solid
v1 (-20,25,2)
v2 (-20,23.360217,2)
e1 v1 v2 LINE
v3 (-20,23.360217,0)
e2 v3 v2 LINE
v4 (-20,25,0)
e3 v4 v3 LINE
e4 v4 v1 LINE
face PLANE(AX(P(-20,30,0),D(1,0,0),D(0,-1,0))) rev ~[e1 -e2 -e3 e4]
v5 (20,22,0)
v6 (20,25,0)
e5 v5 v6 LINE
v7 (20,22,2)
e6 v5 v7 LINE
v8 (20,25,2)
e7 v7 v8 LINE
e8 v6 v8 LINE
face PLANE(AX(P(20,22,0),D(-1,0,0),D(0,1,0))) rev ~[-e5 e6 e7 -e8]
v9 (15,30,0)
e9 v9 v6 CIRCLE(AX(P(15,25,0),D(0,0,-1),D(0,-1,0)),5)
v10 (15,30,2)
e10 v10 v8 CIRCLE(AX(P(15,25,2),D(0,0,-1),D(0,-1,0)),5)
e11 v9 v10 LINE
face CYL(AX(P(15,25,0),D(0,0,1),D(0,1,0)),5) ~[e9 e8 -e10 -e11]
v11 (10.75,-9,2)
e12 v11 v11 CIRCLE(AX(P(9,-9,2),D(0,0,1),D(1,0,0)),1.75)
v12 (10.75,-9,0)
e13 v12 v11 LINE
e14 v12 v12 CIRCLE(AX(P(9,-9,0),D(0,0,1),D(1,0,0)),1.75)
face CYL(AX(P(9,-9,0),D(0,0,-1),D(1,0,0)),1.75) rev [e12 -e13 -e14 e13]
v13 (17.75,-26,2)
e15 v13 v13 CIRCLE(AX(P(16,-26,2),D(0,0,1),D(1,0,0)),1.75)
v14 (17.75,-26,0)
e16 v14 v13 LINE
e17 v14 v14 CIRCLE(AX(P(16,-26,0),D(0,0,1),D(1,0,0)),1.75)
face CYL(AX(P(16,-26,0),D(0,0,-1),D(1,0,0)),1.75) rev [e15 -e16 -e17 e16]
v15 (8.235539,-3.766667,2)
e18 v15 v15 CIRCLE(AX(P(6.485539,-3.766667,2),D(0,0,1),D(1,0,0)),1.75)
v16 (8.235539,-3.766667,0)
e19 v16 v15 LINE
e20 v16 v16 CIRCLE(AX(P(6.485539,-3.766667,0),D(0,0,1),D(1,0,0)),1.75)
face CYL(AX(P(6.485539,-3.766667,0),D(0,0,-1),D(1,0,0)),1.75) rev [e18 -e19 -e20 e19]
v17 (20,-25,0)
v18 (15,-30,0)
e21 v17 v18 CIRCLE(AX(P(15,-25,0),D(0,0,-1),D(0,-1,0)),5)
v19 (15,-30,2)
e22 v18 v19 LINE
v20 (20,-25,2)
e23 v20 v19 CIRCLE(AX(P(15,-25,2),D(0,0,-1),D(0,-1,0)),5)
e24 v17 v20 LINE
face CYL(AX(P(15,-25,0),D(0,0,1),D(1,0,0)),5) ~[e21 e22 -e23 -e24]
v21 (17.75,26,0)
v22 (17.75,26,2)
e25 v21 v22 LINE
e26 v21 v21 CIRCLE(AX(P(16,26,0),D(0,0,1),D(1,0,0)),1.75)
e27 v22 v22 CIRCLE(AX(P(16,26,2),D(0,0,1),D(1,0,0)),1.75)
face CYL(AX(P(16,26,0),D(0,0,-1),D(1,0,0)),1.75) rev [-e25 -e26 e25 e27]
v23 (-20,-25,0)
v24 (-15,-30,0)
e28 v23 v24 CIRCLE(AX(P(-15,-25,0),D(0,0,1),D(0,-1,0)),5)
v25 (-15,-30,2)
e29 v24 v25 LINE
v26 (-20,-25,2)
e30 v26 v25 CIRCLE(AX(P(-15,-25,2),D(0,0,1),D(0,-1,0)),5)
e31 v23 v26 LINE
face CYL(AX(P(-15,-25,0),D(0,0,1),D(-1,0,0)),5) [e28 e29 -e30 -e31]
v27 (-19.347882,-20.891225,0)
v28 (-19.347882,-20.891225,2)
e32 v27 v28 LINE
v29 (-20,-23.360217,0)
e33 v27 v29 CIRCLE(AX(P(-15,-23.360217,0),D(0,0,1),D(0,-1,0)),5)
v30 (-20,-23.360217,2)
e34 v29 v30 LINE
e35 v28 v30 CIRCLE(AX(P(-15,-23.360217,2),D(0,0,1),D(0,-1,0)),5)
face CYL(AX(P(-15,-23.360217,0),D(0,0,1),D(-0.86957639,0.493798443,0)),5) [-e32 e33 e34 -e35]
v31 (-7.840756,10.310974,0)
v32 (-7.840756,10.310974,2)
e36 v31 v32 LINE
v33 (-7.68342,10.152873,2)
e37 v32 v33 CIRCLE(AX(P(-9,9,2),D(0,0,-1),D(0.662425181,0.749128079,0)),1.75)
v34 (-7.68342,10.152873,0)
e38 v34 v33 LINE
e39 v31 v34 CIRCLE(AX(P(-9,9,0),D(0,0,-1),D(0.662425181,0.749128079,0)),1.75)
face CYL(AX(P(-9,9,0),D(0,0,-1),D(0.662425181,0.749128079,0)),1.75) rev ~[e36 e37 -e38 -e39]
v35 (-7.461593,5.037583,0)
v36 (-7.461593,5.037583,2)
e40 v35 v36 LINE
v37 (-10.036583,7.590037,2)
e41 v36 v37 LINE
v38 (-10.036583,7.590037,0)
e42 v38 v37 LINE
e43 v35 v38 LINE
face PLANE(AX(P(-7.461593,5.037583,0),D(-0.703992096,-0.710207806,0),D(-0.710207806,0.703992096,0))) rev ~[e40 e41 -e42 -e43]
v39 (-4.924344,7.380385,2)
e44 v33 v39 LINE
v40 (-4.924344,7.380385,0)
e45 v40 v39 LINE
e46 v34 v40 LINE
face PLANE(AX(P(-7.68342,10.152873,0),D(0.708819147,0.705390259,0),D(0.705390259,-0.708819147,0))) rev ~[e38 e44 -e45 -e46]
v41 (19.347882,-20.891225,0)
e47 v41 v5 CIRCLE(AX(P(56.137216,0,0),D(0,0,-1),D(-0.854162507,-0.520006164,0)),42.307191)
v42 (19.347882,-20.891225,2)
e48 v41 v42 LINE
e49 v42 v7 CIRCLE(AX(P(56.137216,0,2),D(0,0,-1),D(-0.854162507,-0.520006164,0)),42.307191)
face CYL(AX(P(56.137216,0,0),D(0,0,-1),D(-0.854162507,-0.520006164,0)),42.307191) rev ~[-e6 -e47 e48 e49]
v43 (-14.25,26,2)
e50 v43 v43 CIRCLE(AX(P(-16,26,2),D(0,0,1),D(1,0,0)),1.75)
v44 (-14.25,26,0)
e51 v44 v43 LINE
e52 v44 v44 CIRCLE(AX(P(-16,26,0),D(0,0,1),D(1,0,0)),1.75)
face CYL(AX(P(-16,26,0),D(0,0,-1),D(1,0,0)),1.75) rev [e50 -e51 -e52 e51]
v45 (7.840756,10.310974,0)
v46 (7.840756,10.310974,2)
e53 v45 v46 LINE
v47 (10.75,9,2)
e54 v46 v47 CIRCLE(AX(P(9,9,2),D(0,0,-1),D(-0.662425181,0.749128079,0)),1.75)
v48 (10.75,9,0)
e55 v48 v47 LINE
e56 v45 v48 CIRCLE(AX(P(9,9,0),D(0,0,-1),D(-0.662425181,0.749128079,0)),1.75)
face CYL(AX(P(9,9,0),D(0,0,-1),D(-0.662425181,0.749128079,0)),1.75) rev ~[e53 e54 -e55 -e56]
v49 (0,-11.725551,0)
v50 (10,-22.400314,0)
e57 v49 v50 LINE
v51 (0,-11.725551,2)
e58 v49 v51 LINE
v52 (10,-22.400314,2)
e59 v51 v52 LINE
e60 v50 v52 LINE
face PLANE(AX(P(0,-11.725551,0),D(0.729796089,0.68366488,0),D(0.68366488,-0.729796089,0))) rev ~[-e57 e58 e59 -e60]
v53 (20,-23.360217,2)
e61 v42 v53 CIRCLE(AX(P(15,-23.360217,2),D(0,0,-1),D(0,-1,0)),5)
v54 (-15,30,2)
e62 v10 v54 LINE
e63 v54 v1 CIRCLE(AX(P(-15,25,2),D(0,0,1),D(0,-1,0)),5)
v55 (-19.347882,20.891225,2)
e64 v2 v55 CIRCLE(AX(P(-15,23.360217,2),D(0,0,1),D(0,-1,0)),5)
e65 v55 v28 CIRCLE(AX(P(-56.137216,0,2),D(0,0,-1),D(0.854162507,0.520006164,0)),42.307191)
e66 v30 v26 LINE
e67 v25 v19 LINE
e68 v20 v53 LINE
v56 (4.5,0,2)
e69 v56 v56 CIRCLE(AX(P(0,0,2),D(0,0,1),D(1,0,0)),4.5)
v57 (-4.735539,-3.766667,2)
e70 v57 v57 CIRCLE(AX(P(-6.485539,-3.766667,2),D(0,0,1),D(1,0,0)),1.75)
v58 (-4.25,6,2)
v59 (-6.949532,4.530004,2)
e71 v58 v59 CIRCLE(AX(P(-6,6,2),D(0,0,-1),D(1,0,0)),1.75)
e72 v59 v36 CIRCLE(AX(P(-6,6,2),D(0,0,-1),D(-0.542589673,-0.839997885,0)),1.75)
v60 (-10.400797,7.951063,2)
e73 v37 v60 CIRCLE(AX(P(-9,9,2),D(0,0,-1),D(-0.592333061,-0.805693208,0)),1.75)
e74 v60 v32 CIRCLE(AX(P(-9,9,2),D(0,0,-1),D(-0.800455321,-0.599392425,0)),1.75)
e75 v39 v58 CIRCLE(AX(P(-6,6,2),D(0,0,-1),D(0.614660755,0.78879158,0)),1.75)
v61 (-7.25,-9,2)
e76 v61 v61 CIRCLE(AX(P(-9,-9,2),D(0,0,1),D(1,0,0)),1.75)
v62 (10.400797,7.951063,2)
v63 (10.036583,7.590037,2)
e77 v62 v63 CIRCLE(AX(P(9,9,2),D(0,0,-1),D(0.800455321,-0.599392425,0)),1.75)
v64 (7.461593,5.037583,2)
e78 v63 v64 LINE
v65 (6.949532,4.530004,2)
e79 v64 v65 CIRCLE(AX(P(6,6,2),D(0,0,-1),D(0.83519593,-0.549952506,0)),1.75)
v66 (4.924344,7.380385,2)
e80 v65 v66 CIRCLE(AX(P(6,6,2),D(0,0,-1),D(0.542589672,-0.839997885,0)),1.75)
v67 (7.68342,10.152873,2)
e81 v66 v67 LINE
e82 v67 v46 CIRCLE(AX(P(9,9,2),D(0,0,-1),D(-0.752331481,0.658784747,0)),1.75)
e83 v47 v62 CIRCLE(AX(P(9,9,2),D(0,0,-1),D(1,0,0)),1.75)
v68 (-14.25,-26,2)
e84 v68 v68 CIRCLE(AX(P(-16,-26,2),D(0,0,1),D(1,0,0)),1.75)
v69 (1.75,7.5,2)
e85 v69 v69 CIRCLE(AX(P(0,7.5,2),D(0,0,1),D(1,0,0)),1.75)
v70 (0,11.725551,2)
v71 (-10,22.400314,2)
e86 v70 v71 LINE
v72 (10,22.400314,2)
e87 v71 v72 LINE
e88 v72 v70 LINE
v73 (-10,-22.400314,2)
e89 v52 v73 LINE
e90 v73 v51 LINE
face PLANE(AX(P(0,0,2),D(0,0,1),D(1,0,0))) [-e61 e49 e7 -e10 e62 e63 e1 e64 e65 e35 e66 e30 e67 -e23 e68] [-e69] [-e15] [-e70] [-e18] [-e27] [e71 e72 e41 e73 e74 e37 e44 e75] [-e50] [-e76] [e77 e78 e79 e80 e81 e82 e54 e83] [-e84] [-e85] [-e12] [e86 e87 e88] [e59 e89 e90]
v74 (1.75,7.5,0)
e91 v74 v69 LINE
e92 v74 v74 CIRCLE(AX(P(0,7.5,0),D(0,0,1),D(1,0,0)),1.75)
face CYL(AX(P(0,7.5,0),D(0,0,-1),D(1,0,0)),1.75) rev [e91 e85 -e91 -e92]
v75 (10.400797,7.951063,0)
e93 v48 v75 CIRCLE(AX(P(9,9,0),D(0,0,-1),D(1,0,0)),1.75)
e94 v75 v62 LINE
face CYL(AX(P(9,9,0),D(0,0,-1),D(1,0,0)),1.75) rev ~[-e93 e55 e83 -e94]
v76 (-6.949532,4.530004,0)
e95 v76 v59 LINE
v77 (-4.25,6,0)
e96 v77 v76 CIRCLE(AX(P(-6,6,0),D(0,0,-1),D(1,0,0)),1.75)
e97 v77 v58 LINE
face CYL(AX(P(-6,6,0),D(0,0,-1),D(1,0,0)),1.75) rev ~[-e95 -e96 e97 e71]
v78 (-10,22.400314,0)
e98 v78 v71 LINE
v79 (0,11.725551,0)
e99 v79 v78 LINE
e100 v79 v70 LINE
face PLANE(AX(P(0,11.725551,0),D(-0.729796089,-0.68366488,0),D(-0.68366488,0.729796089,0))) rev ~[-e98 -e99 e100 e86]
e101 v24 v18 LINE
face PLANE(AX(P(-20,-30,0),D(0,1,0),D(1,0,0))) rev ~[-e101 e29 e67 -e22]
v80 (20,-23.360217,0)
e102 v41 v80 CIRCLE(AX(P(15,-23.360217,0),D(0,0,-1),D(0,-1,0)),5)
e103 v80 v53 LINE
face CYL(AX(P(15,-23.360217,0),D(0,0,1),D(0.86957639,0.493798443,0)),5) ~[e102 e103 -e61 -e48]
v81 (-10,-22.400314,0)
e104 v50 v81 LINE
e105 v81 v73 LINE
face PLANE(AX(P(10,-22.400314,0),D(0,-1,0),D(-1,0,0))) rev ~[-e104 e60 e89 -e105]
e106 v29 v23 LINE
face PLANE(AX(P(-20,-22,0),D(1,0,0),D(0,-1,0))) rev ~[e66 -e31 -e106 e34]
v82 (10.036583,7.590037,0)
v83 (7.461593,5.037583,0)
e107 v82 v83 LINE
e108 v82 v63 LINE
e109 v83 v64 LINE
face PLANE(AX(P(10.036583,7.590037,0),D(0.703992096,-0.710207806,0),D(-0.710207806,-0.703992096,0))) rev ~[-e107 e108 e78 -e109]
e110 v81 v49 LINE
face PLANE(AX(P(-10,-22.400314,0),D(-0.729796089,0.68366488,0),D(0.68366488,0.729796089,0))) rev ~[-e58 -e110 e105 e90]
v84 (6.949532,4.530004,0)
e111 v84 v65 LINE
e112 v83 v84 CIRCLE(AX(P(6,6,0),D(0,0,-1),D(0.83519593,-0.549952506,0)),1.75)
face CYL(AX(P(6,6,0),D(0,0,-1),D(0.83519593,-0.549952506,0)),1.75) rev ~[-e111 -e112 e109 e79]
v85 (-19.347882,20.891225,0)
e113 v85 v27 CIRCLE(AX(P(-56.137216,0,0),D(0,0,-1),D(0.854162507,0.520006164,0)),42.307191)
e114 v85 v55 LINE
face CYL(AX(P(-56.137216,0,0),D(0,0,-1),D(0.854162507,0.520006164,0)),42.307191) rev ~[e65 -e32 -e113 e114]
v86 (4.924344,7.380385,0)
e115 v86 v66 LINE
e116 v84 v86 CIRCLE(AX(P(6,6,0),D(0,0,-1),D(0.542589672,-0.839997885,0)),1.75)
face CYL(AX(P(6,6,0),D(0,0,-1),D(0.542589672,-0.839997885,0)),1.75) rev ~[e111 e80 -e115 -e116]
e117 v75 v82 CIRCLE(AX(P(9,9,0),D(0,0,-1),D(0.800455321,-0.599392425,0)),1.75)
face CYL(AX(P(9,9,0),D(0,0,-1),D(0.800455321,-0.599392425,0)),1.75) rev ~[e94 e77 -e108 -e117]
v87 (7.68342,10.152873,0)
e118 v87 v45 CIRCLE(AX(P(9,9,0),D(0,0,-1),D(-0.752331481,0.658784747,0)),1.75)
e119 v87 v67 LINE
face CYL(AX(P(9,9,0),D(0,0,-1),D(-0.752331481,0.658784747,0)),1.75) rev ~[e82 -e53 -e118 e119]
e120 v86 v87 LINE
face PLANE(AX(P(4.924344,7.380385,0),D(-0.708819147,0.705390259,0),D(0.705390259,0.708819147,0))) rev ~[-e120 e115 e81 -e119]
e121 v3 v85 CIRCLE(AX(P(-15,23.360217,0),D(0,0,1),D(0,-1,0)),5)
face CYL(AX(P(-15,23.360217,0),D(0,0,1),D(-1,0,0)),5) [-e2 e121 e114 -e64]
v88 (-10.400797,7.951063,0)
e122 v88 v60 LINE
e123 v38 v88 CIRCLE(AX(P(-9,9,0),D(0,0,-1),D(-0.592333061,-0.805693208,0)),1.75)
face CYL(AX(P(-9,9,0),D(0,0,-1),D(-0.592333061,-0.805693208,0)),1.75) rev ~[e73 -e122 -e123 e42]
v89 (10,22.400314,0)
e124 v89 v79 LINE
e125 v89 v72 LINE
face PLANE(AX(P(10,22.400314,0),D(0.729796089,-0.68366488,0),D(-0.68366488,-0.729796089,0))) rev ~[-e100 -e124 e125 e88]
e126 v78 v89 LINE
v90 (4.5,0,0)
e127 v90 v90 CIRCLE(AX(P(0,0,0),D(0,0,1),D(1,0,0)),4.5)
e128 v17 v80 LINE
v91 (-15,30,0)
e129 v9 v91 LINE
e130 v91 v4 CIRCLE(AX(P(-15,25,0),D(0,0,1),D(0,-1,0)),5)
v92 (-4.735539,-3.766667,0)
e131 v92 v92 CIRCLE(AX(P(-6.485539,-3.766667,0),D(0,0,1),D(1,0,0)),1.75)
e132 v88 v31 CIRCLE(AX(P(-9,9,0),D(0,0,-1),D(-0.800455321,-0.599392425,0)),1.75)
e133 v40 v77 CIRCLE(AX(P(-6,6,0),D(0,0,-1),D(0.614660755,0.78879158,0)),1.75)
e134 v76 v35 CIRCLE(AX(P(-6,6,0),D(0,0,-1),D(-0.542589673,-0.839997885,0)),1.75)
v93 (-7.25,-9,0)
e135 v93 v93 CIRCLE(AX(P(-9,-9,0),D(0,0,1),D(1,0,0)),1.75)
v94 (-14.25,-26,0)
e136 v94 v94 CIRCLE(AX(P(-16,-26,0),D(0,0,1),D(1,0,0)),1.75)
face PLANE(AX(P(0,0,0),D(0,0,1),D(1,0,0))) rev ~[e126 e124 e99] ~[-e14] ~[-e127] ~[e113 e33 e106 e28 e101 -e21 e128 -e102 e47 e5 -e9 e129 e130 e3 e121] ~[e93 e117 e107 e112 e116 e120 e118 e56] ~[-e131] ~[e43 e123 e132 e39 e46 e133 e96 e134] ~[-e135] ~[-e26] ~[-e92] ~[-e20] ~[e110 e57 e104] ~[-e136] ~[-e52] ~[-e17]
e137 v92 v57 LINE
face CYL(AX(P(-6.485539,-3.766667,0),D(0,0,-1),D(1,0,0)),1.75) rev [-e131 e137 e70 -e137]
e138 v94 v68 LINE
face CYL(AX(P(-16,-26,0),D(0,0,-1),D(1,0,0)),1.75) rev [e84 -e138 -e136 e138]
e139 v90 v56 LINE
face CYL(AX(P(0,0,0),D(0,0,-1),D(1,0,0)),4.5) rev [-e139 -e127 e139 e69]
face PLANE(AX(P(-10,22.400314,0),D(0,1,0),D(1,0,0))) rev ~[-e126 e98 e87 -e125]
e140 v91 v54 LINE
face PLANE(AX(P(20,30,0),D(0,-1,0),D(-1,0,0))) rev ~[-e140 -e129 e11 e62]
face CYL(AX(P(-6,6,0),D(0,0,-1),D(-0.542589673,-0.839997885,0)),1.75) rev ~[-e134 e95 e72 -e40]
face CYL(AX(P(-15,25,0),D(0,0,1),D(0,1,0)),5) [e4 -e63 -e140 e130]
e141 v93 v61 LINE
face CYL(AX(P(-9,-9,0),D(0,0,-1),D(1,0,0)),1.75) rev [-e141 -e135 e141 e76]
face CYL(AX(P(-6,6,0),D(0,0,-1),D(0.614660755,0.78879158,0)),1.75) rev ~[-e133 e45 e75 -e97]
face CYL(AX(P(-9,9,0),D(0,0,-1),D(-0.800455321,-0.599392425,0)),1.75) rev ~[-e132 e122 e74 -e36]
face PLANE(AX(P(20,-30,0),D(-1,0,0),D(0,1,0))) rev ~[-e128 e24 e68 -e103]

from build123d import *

# Parameters (mm, degrees)
F0_R     = 1.75
F0_R_2   = 4.5
F1_DEPTH = 2
F2_R     = 5


with BuildPart() as f1:
    # F0 (on Top) → F1 (new body)
    with BuildSketch(Plane.XY):
        with BuildLine():
            Line((20, 30), (-20, 30))
            Line((-20, 30), (-20, 22))
            ThreePointArc((-20, 22), (-13.8300253787, 0), (-20, -22))
            Line((-20, -22), (-20, -30))
            Line((-20, -30), (20, -30))
            Line((20, -30), (20, -22))
            ThreePointArc((20, -22), (13.8300253787, 0), (20, 22))
            Line((20, 22), (20, 30))
        make_face()
        with Locations((-16, -26)):
            Circle(F0_R, mode=Mode.SUBTRACT)
        with Locations((-9, -9)):
            Circle(F0_R, mode=Mode.SUBTRACT)
        with Locations((-6.4855394704, -3.7666666667)):
            Circle(F0_R, mode=Mode.SUBTRACT)
        Polygon((10, -22.4003139883), (0, -22.4003139883), (-10, -22.4003139883), (0, -11.7255505174), align=None, mode=Mode.SUBTRACT)
        with Locations((16, -26)):
            Circle(F0_R, mode=Mode.SUBTRACT)
        with Locations((9, -9)):
            Circle(F0_R, mode=Mode.SUBTRACT)
        with Locations((6.4855394704, -3.7666666667)):
            Circle(F0_R, mode=Mode.SUBTRACT)
        with BuildLine():
            ThreePointArc((-10.4007968114, 7.9510632559), (-10.1861204729, 10.2867082901), (-7.840755933, 10.310974139))
            ThreePointArc((-7.840755933, 10.310974139), (-7.7595664935, 10.2344329532), (-7.6834199086, 10.1528733074))
            Line((-7.6834199086, 10.1528733074), (-4.9243436791, 7.3803852648))
            ThreePointArc((-4.9243436791, 7.3803852648), (-4.4275976085, 6.7681475895), (-4.25, 6))
            ThreePointArc((-4.25, 6), (-5.1630952479, 4.4630906221), (-6.9495319267, 4.5300037006))
            ThreePointArc((-6.9495319267, 4.5300037006), (-7.2319861689, 4.7571363391), (-7.4615928772, 5.0375831146))
            Line((-7.4615928772, 5.0375831146), (-10.0365828557, 7.5900368858))
            ThreePointArc((-10.0365828557, 7.5900368858), (-10.2319861689, 7.7571363391), (-10.4007968114, 7.9510632559))
        make_face(mode=Mode.SUBTRACT)
        with Locations((-16, 26)):
            Circle(F0_R, mode=Mode.SUBTRACT)
        Circle(F0_R_2, mode=Mode.SUBTRACT)
        with Locations((0, 7.5)):
            Circle(F0_R, mode=Mode.SUBTRACT)
        with BuildLine():
            ThreePointArc((7.840755933, 10.310974139), (9.7189655356, 10.5954900685), (10.75, 9))
            ThreePointArc((10.75, 9), (10.6604057365, 8.4472317031), (10.4007968114, 7.9510632559))
            ThreePointArc((10.4007968114, 7.9510632559), (10.2319861689, 7.7571363391), (10.0365828557, 7.5900368858))
            Line((10.0365828557, 7.5900368858), (7.4615928772, 5.0375831146))
            ThreePointArc((7.4615928772, 5.0375831146), (7.2319861689, 4.7571363391), (6.9495319267, 4.5300037006))
            ThreePointArc((6.9495319267, 4.5300037006), (4.5734147043, 4.9864150781), (4.9243436791, 7.3803852648))
            Line((4.9243436791, 7.3803852648), (7.6834199086, 10.1528733074))
            ThreePointArc((7.6834199086, 10.1528733074), (7.7595664935, 10.2344329532), (7.840755933, 10.310974139))
        make_face(mode=Mode.SUBTRACT)
        Polygon((0, 22.4003139883), (10, 22.4003139883), (0, 11.7255505174), (-10, 22.4003139883), align=None, mode=Mode.SUBTRACT)
        with Locations((16, 26)):
            Circle(F0_R, mode=Mode.SUBTRACT)
    extrude(amount=F1_DEPTH)

    # F2
    f2_edges = [f1.edges().sort_by_distance(p)[0] for p in [
        (-20, 30, 1),
        (-20, -30, 1),
        (20, -30, 1),
        (20, 30, 1),
        (20, -22, 1),
        (-20, -22, 1),
        (-20, 22, 1),
    ]]
    fillet(f2_edges, radius=F2_R)


solid = f1.part
